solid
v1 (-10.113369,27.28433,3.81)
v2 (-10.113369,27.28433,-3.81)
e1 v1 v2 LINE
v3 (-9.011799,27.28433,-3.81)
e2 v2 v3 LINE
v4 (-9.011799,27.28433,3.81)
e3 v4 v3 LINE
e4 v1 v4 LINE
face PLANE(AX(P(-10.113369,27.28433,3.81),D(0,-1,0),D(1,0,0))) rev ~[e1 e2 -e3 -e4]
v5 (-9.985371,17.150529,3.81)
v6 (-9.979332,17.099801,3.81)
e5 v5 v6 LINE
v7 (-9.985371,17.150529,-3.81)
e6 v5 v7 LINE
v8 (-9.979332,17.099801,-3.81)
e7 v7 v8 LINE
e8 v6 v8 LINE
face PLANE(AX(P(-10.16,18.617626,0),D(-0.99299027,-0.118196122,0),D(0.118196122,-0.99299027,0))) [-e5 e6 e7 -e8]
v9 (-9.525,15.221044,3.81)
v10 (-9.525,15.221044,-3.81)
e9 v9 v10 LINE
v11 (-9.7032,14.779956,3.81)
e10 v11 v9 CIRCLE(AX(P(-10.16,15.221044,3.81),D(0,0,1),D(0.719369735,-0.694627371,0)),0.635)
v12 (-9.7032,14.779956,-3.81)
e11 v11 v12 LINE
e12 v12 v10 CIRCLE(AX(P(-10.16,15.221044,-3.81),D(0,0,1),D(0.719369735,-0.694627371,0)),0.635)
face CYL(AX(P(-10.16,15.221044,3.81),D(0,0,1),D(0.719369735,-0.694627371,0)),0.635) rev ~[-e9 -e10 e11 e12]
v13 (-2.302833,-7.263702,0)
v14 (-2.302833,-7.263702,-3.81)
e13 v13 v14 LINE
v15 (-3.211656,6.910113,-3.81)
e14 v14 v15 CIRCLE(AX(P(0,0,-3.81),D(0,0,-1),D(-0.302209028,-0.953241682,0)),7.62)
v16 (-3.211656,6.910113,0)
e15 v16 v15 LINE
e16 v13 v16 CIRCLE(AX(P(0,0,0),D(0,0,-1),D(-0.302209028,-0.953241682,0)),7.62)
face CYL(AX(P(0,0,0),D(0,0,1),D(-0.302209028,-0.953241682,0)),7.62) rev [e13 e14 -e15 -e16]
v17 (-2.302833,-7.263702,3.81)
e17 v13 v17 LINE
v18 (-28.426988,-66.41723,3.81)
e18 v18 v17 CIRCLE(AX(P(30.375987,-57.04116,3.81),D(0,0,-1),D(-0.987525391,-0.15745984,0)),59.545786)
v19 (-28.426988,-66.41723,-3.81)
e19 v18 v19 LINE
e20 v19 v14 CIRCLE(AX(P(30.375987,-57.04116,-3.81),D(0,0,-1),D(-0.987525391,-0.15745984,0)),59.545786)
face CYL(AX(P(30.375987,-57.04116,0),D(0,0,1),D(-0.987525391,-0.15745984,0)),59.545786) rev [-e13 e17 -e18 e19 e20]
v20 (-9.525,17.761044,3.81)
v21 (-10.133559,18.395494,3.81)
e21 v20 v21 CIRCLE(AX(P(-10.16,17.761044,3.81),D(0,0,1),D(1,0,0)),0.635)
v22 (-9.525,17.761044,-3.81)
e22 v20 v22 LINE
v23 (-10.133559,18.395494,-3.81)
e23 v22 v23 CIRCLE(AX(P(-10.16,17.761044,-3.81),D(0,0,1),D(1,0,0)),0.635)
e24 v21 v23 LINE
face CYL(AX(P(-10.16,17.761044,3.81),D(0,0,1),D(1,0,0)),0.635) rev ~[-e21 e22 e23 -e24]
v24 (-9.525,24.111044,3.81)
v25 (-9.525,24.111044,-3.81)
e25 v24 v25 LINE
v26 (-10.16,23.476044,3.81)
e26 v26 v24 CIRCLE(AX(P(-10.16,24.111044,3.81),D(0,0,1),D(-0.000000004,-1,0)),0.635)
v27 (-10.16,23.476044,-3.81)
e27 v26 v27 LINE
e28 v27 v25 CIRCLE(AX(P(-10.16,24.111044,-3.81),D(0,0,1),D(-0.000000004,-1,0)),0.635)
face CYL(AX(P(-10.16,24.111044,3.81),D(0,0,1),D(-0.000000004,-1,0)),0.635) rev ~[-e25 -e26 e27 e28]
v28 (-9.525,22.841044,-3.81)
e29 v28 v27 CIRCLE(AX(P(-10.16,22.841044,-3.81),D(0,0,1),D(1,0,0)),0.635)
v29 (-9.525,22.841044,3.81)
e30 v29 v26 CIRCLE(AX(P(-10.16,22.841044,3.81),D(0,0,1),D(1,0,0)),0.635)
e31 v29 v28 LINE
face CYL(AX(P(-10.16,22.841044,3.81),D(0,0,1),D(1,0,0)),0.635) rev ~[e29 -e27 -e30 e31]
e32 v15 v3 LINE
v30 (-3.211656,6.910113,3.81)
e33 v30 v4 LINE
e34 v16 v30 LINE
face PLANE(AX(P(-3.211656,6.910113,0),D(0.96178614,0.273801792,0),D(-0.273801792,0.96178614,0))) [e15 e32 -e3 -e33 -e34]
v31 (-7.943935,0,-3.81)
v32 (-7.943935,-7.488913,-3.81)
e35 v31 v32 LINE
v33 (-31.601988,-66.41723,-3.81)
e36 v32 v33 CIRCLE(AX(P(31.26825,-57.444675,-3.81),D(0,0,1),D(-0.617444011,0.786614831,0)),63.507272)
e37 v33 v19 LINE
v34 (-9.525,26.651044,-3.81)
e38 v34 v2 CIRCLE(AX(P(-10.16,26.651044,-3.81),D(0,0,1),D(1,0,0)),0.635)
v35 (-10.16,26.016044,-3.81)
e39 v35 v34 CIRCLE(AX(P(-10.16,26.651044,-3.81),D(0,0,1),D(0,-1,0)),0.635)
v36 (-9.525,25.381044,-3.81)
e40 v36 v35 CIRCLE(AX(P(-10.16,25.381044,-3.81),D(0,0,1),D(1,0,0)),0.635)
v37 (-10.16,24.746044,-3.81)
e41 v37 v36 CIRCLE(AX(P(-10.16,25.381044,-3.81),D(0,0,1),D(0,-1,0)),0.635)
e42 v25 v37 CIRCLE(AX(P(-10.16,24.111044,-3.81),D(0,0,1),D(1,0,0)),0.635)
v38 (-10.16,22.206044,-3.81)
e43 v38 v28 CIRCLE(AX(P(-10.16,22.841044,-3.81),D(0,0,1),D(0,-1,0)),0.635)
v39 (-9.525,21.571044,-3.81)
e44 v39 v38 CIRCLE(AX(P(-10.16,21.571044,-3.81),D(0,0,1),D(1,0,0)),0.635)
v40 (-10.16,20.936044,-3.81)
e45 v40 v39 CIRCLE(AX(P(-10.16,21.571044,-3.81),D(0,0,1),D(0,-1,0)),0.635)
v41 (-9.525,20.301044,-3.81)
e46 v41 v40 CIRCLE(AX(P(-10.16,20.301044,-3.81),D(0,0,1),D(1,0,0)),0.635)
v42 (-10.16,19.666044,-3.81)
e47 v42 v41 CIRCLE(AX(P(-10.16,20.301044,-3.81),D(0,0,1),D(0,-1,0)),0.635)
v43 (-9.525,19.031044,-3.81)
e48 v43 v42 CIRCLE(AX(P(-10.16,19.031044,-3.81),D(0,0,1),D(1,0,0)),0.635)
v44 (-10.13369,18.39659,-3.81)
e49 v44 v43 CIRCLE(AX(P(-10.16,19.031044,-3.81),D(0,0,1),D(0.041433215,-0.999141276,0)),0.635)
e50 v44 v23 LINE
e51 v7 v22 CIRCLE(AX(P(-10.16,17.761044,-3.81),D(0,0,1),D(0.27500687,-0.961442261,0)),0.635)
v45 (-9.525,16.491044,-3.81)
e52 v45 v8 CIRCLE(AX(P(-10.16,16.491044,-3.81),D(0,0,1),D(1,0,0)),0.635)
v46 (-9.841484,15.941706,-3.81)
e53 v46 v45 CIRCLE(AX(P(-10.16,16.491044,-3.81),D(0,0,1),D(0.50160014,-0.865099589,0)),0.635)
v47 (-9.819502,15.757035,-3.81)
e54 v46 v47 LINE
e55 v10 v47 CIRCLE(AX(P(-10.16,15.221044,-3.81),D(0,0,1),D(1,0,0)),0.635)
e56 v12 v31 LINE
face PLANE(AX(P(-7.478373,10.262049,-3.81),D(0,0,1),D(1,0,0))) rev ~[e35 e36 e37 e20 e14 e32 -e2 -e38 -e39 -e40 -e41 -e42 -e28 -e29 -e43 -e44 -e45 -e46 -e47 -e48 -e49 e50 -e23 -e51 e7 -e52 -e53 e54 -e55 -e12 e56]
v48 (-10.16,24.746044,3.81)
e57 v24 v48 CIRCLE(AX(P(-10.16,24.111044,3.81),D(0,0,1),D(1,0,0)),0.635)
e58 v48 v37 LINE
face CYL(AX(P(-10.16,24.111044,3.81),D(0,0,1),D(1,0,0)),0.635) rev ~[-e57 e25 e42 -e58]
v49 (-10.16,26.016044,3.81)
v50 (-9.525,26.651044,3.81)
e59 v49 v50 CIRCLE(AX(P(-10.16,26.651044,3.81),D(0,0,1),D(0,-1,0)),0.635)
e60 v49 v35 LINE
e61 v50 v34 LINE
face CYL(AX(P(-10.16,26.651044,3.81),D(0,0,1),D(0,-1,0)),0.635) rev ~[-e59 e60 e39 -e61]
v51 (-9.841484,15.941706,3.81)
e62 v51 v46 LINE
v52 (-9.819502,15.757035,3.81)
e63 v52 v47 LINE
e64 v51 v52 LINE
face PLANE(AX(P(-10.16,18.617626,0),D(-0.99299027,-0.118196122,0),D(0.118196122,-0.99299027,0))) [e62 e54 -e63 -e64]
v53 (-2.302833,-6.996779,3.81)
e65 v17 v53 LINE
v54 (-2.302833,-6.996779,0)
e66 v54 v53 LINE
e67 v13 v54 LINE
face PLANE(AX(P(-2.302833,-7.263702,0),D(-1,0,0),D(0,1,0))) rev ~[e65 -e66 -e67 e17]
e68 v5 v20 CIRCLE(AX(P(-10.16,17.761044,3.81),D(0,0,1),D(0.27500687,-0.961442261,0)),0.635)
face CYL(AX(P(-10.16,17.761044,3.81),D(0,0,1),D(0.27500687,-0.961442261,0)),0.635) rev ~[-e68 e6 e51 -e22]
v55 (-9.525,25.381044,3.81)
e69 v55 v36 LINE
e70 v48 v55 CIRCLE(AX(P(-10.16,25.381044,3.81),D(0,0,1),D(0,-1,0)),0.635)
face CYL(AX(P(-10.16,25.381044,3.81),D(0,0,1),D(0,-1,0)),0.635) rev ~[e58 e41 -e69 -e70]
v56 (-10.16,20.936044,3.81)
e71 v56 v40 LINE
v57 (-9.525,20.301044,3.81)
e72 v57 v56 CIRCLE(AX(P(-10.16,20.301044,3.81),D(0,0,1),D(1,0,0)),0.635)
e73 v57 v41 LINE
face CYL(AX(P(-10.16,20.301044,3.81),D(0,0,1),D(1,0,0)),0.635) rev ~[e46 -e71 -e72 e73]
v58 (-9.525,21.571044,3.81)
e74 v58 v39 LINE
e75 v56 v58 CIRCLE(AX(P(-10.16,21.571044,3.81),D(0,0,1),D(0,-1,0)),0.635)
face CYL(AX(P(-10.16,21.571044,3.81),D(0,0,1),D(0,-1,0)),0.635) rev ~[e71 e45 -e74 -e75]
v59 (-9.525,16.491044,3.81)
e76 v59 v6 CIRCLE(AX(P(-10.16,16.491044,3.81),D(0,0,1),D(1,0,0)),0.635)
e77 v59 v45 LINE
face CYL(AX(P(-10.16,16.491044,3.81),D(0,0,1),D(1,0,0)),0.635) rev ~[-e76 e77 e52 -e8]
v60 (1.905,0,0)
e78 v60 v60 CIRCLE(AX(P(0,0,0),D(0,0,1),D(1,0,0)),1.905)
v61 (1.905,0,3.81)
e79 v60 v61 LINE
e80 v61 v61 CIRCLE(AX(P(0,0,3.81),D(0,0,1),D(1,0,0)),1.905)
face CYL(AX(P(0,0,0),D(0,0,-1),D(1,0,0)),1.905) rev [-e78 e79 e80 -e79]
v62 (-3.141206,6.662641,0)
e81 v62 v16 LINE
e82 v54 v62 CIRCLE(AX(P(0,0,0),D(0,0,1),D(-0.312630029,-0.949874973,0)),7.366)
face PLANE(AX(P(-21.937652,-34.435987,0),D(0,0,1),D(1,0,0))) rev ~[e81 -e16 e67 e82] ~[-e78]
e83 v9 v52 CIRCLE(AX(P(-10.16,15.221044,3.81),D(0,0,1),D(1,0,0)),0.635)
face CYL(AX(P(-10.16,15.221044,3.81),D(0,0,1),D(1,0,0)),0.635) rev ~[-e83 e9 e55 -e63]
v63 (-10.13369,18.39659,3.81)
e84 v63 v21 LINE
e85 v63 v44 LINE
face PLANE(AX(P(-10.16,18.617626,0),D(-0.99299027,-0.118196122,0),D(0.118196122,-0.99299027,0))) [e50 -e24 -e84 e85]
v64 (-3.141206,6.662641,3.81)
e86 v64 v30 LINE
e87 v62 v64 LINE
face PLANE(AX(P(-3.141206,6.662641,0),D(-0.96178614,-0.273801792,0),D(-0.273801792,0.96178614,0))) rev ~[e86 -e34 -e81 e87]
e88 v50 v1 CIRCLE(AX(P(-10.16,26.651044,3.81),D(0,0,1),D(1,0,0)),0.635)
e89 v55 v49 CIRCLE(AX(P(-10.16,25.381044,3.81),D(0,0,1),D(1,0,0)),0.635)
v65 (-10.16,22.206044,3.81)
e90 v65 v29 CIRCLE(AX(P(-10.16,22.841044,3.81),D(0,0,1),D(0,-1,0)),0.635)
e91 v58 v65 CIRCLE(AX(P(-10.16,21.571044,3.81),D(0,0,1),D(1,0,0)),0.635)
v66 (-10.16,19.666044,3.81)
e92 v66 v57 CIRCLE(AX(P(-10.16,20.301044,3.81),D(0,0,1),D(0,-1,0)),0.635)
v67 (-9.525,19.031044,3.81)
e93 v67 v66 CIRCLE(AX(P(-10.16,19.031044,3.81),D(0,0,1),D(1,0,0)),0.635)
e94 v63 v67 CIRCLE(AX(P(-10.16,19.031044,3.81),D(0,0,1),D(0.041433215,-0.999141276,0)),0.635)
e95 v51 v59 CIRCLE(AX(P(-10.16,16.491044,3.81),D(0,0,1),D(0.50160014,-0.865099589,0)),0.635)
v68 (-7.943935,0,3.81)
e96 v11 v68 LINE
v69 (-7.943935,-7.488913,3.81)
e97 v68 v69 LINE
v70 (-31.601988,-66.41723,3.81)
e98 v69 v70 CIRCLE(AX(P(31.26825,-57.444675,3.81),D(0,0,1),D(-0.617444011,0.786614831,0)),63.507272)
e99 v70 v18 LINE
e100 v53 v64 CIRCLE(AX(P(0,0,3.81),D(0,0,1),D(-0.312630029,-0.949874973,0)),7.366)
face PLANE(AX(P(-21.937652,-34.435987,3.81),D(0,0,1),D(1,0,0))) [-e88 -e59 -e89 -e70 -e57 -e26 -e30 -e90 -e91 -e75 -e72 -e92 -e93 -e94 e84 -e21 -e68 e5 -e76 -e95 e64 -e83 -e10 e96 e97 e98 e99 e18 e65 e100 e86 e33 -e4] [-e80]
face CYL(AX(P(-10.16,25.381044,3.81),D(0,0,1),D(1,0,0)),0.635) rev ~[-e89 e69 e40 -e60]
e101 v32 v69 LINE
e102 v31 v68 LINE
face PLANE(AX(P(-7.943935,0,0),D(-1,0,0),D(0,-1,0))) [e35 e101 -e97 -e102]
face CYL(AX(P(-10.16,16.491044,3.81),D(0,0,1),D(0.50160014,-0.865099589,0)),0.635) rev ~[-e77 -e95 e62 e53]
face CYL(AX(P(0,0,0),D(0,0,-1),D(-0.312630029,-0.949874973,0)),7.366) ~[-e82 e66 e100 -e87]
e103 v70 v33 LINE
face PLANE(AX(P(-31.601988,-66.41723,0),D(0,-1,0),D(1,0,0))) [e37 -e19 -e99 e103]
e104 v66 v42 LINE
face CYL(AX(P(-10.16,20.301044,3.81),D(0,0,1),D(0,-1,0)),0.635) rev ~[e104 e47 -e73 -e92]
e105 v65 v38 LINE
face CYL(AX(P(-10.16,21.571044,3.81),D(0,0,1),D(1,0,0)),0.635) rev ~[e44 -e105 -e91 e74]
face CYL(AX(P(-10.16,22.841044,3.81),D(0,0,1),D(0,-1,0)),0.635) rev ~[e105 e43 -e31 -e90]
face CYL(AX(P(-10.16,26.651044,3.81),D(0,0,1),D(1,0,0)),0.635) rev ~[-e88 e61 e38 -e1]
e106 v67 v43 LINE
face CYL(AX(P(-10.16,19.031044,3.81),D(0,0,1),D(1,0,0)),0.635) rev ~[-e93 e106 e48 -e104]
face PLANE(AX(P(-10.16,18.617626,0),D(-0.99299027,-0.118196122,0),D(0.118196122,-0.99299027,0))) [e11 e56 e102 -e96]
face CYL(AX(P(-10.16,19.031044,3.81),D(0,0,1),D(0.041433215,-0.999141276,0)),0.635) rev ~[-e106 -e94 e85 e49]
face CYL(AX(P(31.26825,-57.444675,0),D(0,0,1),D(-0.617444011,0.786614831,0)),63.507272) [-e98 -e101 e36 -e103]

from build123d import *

# Parameters (mm, degrees)
F0_R     = 1.905
F1_DEPTH = 3.81
F2_DEPTH = 3.81
F4_DEPTH = 7.621


# Not quite as in the source:
# - a feature names something its author has since deleted; it is built from what else it names


with BuildPart() as f1:
    # F0 (on Top) → F1 (new body)
    with BuildSketch(Plane.XY):
        with BuildLine():
            ThreePointArc((-28.4269883335, -66.4172298291), (-24.0943230698, -32.9852682882), (-2.3028327904, -7.2637016141))
            Line((-2.3028327904, -7.2637016141), (-7.943934761, -7.4889131964))
            ThreePointArc((-7.943934761, -7.4889131964), (-27.6668151141, -33.7839124183), (-31.6019883335, -66.4172298291))
            Line((-31.6019883335, -66.4172298291), (-28.4269883335, -66.4172298291))
        make_face()
        with BuildLine():
            ThreePointArc((-2.3028327904, -7.2637016141), (-7.6043838567, -0.4875922071), (-3.211656147, 6.9101132258))
            Line((-3.211656147, 6.9101132258), (-10.16, 31.3176262796))
            Line((-10.16, 31.3176262796), (-10.16, 18.6176262796))
            Line((-10.16, 18.6176262796), (-7.943934761, 0))
            Line((-7.943934761, 0), (-7.943934761, -7.4889131964))
            Line((-7.943934761, -7.4889131964), (-2.3028327904, -7.2637016141))
        make_face()
        with BuildLine():
            ThreePointArc((7.366, 0), (3.9446061685, 6.2207747247), (-3.1412055867, 6.6626408775))
            ThreePointArc((-3.1412055867, 6.6626408775), (-7.3521647617, -0.4512530518), (-2.3028327904, -6.9967790546))
            ThreePointArc((-2.3028327904, -6.9967790546), (4.3182918883, -5.9674375713), (7.366, 0))
        make_face()
        Circle(F0_R, mode=Mode.SUBTRACT)
        with BuildLine():
            Line((-3.1412055867, 6.6626408775), (-3.211656147, 6.9101132258))
            ThreePointArc((-3.211656147, 6.9101132258), (-7.6043838567, -0.4875922071), (-2.3028327904, -7.2637016141))
            Line((-2.3028327904, -7.2637016141), (-2.3028327904, -6.9967790546))
            ThreePointArc((-2.3028327904, -6.9967790546), (-7.3521647617, -0.4512530518), (-3.1412055867, 6.6626408775))
        make_face()
    extrude(amount=F1_DEPTH)

    # F0 (on Top) → F2 (join)
    with BuildSketch(Plane.XY):
        with BuildLine():
            ThreePointArc((-2.3028327904, -7.2637016141), (-7.6043838567, -0.4875922071), (-3.211656147, 6.9101132258))
            Line((-3.211656147, 6.9101132258), (-10.16, 31.3176262796))
            Line((-10.16, 31.3176262796), (-10.16, 18.6176262796))
            Line((-10.16, 18.6176262796), (-7.943934761, 0))
            Line((-7.943934761, 0), (-7.943934761, -7.4889131964))
            Line((-7.943934761, -7.4889131964), (-2.3028327904, -7.2637016141))
        make_face()
        with BuildLine():
            ThreePointArc((-28.4269883335, -66.4172298291), (-24.0943230698, -32.9852682882), (-2.3028327904, -7.2637016141))
            Line((-2.3028327904, -7.2637016141), (-7.943934761, -7.4889131964))
            ThreePointArc((-7.943934761, -7.4889131964), (-27.6668151141, -33.7839124183), (-31.6019883335, -66.4172298291))
            Line((-31.6019883335, -66.4172298291), (-28.4269883335, -66.4172298291))
        make_face()
    extrude(amount=-F2_DEPTH)

    # F3 (on face) → F4 (cut, through all)
    with BuildSketch(Plane.XY.offset(3.81)):
        with BuildLine():
            Line((-10.16, 27.284329945), (-10.1133690513, 27.284329945))
            ThreePointArc((-10.1133690513, 27.284329945), (-10.1366687719, 27.2856156574), (-10.16, 27.2860444212))
            Line((-10.16, 27.2860444212), (-10.16, 27.284329945))
        make_face()
        with BuildLine():
            Line((-10.16, 28.5560444212), (-10.16, 27.2860444212))
            ThreePointArc((-10.16, 27.2860444212), (-9.7109871939, 27.4720316151), (-9.525, 27.9210444212))
            ThreePointArc((-9.525, 27.9210444212), (-9.7109871939, 28.3700572272), (-10.16, 28.5560444212))
        make_face()
        with BuildLine():
            Line((-10.1133690513, 27.284329945), (-9.0117990451, 27.284329945))
            Line((-9.0117990451, 27.284329945), (-10.16, 31.3176262796))
            Line((-10.16, 31.3176262796), (-10.16, 28.5560444212))
            ThreePointArc((-10.16, 28.5560444212), (-9.7109871939, 28.3700572272), (-9.525, 27.9210444212))
            ThreePointArc((-9.525, 27.9210444212), (-9.7109871939, 27.4720316151), (-10.16, 27.2860444212))
            ThreePointArc((-10.16, 27.2860444212), (-10.1366687719, 27.2856156574), (-10.1133690513, 27.284329945))
        make_face()
        with BuildLine():
            ThreePointArc((-9.525, 19.0310444212), (-9.7109871939, 19.4800572272), (-10.16, 19.6660444212))
            Line((-10.16, 19.6660444212), (-10.16, 18.6176262796))
            Line((-10.16, 18.6176262796), (-10.1336899082, 18.3965897112))
            ThreePointArc((-10.1336899082, 18.3965897112), (-9.7017795791, 18.5914320398), (-9.525, 19.0310444212))
        make_face()
        with BuildLine():
            Line((-10.16, 27.284329945), (-10.16, 26.0160444212))
            ThreePointArc((-10.16, 26.0160444212), (-9.7109871939, 26.2020316151), (-9.525, 26.6510444212))
            ThreePointArc((-9.525, 26.6510444212), (-9.6947927062, 27.0832563759), (-10.1133690513, 27.284329945))
            Line((-10.1133690513, 27.284329945), (-10.16, 27.284329945))
        make_face()
        with BuildLine():
            Line((-10.16, 26.0160444212), (-10.16, 24.7460444212))
            ThreePointArc((-10.16, 24.7460444212), (-9.7109871939, 24.9320316151), (-9.525, 25.3810444212))
            ThreePointArc((-9.525, 25.3810444212), (-9.7109871939, 25.8300572272), (-10.16, 26.0160444212))
        make_face()
        with BuildLine():
            Line((-10.16, 24.7460444212), (-10.16, 23.4760444212))
            ThreePointArc((-10.1600000026, 23.4760444212), (-9.7109871948, 23.6620316142), (-9.525, 24.1110444212))
            ThreePointArc((-9.525, 24.1110444212), (-9.7109871939, 24.5600572272), (-10.16, 24.7460444212))
        make_face()
        with BuildLine():
            Line((-10.16, 23.4760444212), (-10.16, 22.2060444212))
            ThreePointArc((-10.16, 22.2060444212), (-9.7109871939, 22.3920316151), (-9.525, 22.8410444212))
            ThreePointArc((-9.525, 22.8410444212), (-9.7109871948, 23.2900572282), (-10.1600000026, 23.4760444212))
        make_face()
        with BuildLine():
            Line((-10.16, 22.2060444212), (-10.16, 20.9360444212))
            ThreePointArc((-10.16, 20.9360444212), (-9.7109871939, 21.1220316151), (-9.525, 21.5710444212))
            ThreePointArc((-9.525, 21.5710444212), (-9.7109871939, 22.0200572272), (-10.16, 22.2060444212))
        make_face()
        with BuildLine():
            Line((-10.16, 20.9360444212), (-10.16, 19.6660444212))
            ThreePointArc((-10.16, 19.6660444212), (-9.7109871939, 19.8520316151), (-9.525, 20.3010444212))
            ThreePointArc((-9.525, 20.3010444212), (-9.7109871939, 20.7500572272), (-10.16, 20.9360444212))
        make_face()
        with BuildLine():
            Line((-10.1335594504, 18.3954937079), (-9.9853706378, 17.1505285853))
            ThreePointArc((-9.9853706378, 17.1505285853), (-9.6529917925, 17.3787256046), (-9.525, 17.7610444212))
            ThreePointArc((-9.525, 17.7610444212), (-9.7017343843, 18.20060969), (-10.1335594504, 18.3954937079))
        make_face()
        with BuildLine():
            Line((-9.9793324764, 17.099800732), (-9.8414839109, 15.941706182))
            ThreePointArc((-9.8414839109, 15.941706182), (-9.6097806271, 16.1740528729), (-9.525, 16.4910444212))
            ThreePointArc((-9.525, 16.4910444212), (-9.6511046878, 16.8708477404), (-9.9793324764, 17.099800732))
        make_face()
        with BuildLine():
            ThreePointArc((-9.7032002185, 14.7799560404), (-9.5712331271, 14.9831819202), (-9.525, 15.2210444212))
            ThreePointArc((-9.525, 15.2210444212), (-9.6034746489, 15.5268295313), (-9.8195024679, 15.7570354945))
            Line((-9.8195024679, 15.7570354945), (-9.7032002185, 14.7799560404))
        make_face()
    extrude(amount=-F4_DEPTH, mode=Mode.SUBTRACT)


solid = f1.part
